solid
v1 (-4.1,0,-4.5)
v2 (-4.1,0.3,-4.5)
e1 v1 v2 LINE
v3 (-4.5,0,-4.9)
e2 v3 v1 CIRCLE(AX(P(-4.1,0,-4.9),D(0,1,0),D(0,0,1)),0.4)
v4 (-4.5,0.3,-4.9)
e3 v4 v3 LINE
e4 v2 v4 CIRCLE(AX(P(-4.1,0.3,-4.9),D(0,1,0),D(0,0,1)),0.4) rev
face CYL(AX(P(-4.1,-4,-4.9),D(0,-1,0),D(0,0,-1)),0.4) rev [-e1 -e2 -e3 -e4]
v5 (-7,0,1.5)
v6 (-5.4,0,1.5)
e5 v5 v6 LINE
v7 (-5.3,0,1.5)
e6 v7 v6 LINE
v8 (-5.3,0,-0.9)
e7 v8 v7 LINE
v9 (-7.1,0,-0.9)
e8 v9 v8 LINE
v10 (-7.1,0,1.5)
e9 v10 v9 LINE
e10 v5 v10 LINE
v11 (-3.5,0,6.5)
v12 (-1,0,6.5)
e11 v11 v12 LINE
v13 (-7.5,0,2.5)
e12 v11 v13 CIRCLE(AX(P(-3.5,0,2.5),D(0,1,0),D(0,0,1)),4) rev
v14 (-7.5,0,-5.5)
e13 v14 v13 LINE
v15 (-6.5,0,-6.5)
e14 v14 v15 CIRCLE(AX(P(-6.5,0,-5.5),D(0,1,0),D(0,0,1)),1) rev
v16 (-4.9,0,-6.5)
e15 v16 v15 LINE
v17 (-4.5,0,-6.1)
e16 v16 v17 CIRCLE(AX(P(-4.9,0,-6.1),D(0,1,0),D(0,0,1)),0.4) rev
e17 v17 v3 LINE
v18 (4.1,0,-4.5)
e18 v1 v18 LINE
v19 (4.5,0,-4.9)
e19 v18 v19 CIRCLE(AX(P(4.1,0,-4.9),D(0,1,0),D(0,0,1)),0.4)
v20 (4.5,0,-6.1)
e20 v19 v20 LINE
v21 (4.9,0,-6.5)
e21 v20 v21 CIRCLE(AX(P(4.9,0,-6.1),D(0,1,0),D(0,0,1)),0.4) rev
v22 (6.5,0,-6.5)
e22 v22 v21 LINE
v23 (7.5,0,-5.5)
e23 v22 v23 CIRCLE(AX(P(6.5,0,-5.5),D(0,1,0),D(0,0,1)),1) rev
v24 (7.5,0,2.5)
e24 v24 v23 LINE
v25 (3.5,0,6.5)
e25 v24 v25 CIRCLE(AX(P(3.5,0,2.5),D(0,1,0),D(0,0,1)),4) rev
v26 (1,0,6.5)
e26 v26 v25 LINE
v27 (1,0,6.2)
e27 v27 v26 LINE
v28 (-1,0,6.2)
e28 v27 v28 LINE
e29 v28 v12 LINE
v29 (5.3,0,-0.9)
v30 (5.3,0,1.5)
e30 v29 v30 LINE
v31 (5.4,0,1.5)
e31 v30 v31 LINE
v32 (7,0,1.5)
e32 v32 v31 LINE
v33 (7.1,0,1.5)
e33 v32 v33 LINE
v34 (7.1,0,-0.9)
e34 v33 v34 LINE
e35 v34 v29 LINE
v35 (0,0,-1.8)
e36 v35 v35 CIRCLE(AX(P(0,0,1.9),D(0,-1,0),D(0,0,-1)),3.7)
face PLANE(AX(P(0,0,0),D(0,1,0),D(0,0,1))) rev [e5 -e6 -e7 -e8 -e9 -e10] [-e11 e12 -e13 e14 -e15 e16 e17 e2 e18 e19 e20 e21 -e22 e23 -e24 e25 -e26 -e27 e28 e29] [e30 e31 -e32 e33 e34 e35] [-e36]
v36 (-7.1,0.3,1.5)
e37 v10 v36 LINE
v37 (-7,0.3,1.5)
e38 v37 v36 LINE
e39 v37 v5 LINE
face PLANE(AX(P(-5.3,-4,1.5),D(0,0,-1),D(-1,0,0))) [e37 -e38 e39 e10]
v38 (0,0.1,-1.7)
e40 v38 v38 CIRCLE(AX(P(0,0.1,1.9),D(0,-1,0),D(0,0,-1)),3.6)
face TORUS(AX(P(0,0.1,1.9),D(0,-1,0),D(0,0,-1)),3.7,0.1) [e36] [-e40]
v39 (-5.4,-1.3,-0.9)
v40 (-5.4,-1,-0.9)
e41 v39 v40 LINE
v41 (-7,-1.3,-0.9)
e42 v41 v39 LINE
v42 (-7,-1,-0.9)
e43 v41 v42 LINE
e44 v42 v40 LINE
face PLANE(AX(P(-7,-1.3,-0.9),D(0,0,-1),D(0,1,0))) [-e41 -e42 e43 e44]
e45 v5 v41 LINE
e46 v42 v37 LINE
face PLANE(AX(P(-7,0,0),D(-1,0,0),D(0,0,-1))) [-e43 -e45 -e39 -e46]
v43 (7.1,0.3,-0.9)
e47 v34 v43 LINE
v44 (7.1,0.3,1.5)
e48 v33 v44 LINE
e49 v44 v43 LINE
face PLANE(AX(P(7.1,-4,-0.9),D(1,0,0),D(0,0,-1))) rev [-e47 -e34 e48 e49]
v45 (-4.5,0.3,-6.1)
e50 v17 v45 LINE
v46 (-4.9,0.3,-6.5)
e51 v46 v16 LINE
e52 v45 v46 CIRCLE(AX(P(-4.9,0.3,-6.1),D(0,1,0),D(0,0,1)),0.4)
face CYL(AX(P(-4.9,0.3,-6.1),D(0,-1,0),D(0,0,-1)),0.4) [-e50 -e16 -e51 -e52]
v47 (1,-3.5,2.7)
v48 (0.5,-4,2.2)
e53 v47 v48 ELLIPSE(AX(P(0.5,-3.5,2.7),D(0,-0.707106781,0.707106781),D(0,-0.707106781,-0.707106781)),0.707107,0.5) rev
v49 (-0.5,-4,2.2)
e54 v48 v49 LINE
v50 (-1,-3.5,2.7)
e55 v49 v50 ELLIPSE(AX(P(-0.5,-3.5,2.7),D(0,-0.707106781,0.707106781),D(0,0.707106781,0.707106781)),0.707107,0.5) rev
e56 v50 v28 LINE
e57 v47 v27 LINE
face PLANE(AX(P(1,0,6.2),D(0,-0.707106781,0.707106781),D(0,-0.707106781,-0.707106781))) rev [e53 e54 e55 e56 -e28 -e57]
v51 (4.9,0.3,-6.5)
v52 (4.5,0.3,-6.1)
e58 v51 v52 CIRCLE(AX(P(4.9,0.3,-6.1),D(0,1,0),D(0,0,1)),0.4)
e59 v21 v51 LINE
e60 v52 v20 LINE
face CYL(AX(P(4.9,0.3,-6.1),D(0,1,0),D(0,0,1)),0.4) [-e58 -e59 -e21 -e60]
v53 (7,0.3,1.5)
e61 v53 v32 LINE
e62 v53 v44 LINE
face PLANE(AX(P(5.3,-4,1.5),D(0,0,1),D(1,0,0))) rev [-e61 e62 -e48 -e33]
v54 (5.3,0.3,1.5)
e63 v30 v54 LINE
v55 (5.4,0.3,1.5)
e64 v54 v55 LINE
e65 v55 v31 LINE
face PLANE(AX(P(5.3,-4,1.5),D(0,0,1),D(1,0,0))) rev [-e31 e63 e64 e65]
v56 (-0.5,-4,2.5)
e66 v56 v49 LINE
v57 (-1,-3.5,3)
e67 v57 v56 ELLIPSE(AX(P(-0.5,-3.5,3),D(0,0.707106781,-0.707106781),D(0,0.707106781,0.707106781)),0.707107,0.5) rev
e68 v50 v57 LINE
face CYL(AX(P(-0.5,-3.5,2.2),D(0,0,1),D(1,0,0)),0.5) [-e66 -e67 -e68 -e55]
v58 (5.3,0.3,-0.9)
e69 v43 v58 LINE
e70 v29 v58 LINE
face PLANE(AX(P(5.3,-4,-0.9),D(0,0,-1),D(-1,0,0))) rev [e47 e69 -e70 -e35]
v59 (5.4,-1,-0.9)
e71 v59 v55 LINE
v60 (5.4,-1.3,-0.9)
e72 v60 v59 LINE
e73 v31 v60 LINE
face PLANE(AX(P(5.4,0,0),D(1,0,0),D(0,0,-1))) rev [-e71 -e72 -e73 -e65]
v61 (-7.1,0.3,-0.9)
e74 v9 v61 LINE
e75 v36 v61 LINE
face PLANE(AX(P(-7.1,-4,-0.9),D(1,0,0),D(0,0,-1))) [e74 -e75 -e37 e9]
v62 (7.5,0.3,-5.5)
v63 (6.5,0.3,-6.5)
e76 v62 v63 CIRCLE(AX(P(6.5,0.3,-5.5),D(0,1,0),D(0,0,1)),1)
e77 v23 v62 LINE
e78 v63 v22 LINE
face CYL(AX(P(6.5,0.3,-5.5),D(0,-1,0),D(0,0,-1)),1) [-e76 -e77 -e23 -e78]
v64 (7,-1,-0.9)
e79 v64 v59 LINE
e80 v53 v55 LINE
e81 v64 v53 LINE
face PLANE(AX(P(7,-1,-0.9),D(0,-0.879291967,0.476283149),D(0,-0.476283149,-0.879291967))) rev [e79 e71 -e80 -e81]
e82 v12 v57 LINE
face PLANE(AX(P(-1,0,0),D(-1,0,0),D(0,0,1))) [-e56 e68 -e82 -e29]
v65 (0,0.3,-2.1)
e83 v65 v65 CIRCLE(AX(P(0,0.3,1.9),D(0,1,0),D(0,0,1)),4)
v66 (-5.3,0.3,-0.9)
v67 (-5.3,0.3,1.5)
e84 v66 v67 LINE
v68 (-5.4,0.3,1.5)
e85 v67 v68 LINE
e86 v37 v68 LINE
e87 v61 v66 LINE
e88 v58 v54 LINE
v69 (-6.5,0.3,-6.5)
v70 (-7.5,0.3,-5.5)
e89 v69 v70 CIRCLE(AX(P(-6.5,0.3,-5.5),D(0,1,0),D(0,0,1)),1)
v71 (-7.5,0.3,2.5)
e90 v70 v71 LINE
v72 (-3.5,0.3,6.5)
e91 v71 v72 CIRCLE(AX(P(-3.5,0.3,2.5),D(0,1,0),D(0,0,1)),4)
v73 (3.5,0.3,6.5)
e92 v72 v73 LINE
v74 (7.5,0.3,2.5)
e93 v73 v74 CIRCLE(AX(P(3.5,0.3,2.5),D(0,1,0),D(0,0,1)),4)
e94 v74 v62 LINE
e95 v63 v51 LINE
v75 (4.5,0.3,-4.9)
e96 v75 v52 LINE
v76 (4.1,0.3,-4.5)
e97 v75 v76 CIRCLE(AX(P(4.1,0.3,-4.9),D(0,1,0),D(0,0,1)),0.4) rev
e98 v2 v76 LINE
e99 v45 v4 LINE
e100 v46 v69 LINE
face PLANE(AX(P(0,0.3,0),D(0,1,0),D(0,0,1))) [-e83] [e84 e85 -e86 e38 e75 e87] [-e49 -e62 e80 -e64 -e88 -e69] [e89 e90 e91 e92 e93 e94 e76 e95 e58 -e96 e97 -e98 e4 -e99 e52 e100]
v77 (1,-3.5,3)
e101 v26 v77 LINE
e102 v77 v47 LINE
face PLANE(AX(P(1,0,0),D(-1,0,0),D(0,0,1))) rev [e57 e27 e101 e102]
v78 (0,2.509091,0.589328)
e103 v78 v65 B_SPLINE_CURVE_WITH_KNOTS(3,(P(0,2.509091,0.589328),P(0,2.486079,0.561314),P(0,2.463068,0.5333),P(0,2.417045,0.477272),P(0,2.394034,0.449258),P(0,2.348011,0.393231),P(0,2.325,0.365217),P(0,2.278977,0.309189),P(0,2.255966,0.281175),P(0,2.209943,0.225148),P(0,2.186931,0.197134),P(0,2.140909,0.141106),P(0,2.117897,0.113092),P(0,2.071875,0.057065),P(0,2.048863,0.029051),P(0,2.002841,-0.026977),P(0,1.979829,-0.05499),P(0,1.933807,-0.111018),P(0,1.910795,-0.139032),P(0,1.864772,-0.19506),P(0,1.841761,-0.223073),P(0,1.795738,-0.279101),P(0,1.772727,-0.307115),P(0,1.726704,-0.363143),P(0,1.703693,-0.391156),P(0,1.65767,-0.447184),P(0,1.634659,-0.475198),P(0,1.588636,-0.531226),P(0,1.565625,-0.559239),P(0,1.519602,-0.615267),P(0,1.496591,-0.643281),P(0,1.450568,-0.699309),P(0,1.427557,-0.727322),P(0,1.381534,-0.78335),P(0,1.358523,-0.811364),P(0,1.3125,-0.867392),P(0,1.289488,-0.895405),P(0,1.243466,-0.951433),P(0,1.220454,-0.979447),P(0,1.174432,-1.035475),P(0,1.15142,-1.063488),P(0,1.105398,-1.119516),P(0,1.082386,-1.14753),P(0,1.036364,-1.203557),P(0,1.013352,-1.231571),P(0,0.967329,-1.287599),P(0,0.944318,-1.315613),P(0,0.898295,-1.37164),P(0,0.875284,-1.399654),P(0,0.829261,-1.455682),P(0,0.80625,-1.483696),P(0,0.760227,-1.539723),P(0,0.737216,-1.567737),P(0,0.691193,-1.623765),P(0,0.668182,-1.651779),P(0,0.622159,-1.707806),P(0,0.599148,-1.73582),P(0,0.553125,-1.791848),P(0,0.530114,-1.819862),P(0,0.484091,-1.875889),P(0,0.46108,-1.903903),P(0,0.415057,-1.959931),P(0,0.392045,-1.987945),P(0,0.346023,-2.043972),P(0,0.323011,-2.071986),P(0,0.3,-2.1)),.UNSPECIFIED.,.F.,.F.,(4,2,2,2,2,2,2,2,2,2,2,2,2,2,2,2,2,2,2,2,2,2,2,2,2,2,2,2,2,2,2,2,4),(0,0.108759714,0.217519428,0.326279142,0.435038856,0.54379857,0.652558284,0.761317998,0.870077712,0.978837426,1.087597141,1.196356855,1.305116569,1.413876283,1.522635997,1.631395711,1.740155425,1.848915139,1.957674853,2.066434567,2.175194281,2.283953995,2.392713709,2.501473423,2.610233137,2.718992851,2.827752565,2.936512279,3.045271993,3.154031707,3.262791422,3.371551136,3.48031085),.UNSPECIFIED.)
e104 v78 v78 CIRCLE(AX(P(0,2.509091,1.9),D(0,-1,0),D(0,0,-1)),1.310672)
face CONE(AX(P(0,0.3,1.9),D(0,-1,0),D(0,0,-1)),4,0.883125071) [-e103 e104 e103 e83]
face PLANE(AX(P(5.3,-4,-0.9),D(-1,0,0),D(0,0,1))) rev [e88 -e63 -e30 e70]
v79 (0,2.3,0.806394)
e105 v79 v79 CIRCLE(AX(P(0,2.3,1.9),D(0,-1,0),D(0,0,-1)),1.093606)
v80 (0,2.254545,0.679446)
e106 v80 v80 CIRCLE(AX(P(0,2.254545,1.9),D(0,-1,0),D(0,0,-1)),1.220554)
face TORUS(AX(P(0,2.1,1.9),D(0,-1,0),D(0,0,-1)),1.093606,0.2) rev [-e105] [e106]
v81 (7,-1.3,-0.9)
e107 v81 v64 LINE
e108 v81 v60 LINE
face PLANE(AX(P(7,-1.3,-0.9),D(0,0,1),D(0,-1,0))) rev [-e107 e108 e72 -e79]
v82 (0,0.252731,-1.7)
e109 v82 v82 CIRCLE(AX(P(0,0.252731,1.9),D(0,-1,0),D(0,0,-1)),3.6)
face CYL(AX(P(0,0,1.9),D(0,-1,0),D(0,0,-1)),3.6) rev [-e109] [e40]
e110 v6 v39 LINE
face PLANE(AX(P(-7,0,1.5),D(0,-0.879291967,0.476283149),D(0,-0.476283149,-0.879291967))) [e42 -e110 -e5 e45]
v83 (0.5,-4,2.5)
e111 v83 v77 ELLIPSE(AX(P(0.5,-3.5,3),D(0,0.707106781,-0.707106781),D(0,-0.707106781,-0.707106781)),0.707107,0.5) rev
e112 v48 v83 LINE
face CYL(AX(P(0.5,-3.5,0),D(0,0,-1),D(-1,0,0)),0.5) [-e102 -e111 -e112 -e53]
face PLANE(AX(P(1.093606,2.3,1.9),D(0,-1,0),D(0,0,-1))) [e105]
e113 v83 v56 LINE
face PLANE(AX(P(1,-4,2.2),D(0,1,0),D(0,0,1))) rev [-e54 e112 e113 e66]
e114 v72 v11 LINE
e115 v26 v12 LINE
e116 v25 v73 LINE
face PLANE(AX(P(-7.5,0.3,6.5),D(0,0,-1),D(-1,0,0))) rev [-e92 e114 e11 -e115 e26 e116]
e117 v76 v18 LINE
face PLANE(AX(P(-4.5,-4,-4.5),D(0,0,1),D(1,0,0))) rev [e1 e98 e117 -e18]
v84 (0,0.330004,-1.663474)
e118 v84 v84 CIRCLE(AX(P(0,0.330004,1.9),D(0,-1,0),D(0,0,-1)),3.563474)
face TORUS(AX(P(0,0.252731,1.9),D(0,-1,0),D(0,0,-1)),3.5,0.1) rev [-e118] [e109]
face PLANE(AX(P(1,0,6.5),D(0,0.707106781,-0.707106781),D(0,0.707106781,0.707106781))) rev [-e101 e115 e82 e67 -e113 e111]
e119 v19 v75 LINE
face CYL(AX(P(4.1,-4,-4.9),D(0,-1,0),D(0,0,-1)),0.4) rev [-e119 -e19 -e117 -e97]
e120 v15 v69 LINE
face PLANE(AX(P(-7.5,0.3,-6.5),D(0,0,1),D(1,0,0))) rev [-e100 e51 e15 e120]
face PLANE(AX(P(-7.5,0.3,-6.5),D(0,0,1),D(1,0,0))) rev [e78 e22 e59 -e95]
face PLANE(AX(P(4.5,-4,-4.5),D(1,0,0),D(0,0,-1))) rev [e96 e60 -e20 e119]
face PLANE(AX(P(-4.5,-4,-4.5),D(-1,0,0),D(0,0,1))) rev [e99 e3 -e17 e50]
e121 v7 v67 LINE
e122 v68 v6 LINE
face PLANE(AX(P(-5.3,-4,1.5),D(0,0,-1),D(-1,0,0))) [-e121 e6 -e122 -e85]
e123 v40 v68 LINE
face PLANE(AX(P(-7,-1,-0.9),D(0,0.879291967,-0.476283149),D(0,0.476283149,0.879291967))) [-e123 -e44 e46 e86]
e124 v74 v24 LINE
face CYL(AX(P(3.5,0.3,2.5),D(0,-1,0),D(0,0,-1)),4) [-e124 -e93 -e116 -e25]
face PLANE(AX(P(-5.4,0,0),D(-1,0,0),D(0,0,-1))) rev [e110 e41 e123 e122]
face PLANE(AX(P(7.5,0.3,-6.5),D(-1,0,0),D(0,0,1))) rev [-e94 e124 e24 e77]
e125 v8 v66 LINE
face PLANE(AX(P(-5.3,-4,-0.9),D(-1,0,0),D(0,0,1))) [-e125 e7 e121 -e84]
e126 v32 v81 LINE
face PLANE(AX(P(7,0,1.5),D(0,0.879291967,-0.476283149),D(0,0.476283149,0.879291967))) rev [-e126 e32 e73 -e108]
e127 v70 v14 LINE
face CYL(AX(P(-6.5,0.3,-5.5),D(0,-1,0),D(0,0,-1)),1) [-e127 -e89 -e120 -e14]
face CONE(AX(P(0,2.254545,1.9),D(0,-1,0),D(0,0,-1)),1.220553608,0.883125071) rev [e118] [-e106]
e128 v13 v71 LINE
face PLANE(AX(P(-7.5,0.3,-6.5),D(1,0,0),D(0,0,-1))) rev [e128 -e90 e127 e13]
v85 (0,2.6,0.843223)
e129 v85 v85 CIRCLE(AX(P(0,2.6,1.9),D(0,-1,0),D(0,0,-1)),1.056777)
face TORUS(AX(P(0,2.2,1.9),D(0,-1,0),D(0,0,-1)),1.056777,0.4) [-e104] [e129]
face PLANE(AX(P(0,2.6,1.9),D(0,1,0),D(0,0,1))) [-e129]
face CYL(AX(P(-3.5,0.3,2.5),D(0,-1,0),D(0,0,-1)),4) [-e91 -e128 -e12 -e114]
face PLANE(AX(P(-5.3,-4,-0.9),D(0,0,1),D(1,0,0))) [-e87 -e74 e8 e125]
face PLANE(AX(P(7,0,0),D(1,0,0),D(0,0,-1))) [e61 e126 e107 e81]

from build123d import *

# Parameters (mm, degrees)
SKETCH1_W               = 15
SKETCH1_H               = 13
BASE_DEPTH              = 0.3
SKETCH2_R               = 4
PT_CUT_DEPTH            = 10.92924972
WIRE_CONNECTION_DEPTH   = 1
SKETCH7_W               = 1.8
SKETCH7_H               = 2.4
LOCKING_CLAMP_CUT_DEPTH = 11.816191566
LOCKING_CLAMP_DEPTH     = 0.8
SKETCH9_W               = 9
SKETCH9_H               = 2
BOTTOM_SLOT_CUT_DEPTH   = 11.816191566
TS_F_R                  = 1
BS_F_R                  = 4
WC_F_R                  = 0.5
BSC_F_R                 = 0.4


with BuildPart() as part:
    # Sketch1 → BASE (new body)
    with BuildSketch(Plane(origin=(0, 0, 0), x_dir=(1, 0, 0), z_dir=(0, 1, 0))):
        Rectangle(SKETCH1_W, SKETCH1_H)
    extrude(amount=BASE_DEPTH)

    # Sketch2 → PT CUT (cut, through all)
    with BuildSketch(Plane(origin=(0, 0.3, 0), x_dir=(1, 0, 0), z_dir=(0, 1, 0))):
        with Locations(Location((0, -1.9, 0), (0, 0, 270))):
            Circle(SKETCH2_R)
    extrude(amount=-PT_CUT_DEPTH, mode=Mode.SUBTRACT)

    # Sketch4 → POSITIVE TERMINAL (revolve)
    with BuildSketch(Plane.XY.offset(1.9), mode=Mode.PRIVATE) as positive_terminal_sk:
        with BuildLine():
            Line((0, 2.6), (1.056776663, 2.6))
            ThreePointArc((1.056776663, 2.6), (1.191616938, 2.576587441), (1.310672433, 2.509090502))
            Line((1.310672433, 2.509090502), (4, 0.3))
            Line((4, 0.3), (4, 0))
            Line((4, 0), (3.7, 0))
            ThreePointArc((3.7, 0), (3.629289322, 0.029289322), (3.6, 0.1))
            Line((3.6, 0.1), (3.6, 0.252730922))
            ThreePointArc((3.6, 0.252730922), (3.590408501, 0.295466187), (3.563473942, 0.330003547))
            Line((3.563473942, 0.330003547), (1.220553608, 2.254545251))
            ThreePointArc((1.220553608, 2.254545251), (1.16102586, 2.28829372), (1.093605723, 2.3))
            Line((1.093605723, 2.3), (0, 2.3))
            Line((0, 2.3), (0, 2.6))
        make_face()
    revolve(positive_terminal_sk.sketch.rotate(Axis((0, 0, 1.9), (0, 1, 0)), 90), axis=Axis((0, 0, 1.9), (0, 1, 0)))

    # Sketch5 → WIRE CONNECTION (add, symmetric)
    with BuildSketch(Plane(origin=(0, 0, 0), x_dir=(0, 0, -1), z_dir=(1, 0, 0))):
        Polygon((-6.5, 0), (-2.5, -4), (-2.2, -4), (-6.2, 0), align=None)
    extrude(amount=WIRE_CONNECTION_DEPTH, both=True)

    # Sketch7 → LOCKING CLAMP CUT (cut, through all)
    with BuildSketch(Plane(origin=(0, 0.3, 0), x_dir=(1, 0, 0), z_dir=(0, 1, 0))):
        with Locations((6.2, -0.3)):
            Rectangle(SKETCH7_W, SKETCH7_H)
    locking_clamp_cut = extrude(amount=-LOCKING_CLAMP_CUT_DEPTH, mode=Mode.SUBTRACT)

    # Sketch8 → LOCKING CLAMP (add, symmetric)
    with BuildSketch(Plane(origin=(6.2, 0, 0), x_dir=(0, 0, -1), z_dir=(1, 0, 0))):
        Polygon((0.9, -1), (-1.5, 0.3), (-1.5, 0), (0.9, -1.3), align=None)
    locking_clamp = extrude(amount=LOCKING_CLAMP_DEPTH, both=True)

    # LC M: LOCKING CLAMP CUT, LOCKING CLAMP across plane
    add(locking_clamp_cut.mirror(Plane(origin=(0, 0, 0), x_dir=(0, 0, 1), z_dir=(1, 0, 0))), mode=Mode.SUBTRACT)
    add(locking_clamp.mirror(Plane(origin=(0, 0, 0), x_dir=(0, 0, 1), z_dir=(1, 0, 0))))

    # Sketch9 → BOTTOM SLOT CUT (cut, through all)
    with BuildSketch(Plane(origin=(0, 0.3, 0), x_dir=(1, 0, 0), z_dir=(0, 1, 0))):
        with Locations((0, 5.5)):
            Rectangle(SKETCH9_W, SKETCH9_H)
    extrude(amount=-BOTTOM_SLOT_CUT_DEPTH, mode=Mode.SUBTRACT)

    # TS F
    ts_f_edges = [part.edges().sort_by_distance(p)[0] for p in [
        (-7.5, 0.15, -6.5),
        (7.5, 0.15, -6.5),
    ]]
    fillet(ts_f_edges, radius=TS_F_R)

    # BS F
    bs_f_edges = [part.edges().sort_by_distance(p)[0] for p in [
        (7.5, 0.15, 6.5),
        (-7.5, 0.15, 6.5),
    ]]
    fillet(bs_f_edges, radius=BS_F_R)

    # WC F
    # the kernel refuses this fillet: 0.5 mm, written as the material it takes off along each edge
    with BuildSketch(Plane(origin=(-1, -4, 3.75), x_dir=(0, 1, 0), z_dir=(0, 0, -1))) as wc_f_piece_1:
        with BuildLine():
            CenterArc((WC_F_R, WC_F_R), WC_F_R, 180, 90)
            Line((0, WC_F_R), (0, 0))
            Line((0, 0), (WC_F_R, 0))
        make_face()
    extrude(amount=2.8, mode=Mode.SUBTRACT)
    with BuildSketch(Plane(origin=(1, -4, 3.75), x_dir=(0, 1, 0), z_dir=(0, 0, -1))) as wc_f_piece_2:
        with BuildLine():
            CenterArc((WC_F_R, -WC_F_R), WC_F_R, 90, 90)
            Line((0, -WC_F_R), (0, 0))
            Line((0, 0), (WC_F_R, 0))
        make_face()
    extrude(amount=2.8, mode=Mode.SUBTRACT)

    # BSC F
    bsc_f_edges = [part.edges().sort_by_distance(p)[0] for p in [
        (-4.5, 0.15, -6.5),
        (4.5, 0.15, -6.5),
        (4.5, 0.15, -4.5),
        (-4.5, 0.15, -4.5),
    ]]
    fillet(bsc_f_edges, radius=BSC_F_R)


solid = part.part
